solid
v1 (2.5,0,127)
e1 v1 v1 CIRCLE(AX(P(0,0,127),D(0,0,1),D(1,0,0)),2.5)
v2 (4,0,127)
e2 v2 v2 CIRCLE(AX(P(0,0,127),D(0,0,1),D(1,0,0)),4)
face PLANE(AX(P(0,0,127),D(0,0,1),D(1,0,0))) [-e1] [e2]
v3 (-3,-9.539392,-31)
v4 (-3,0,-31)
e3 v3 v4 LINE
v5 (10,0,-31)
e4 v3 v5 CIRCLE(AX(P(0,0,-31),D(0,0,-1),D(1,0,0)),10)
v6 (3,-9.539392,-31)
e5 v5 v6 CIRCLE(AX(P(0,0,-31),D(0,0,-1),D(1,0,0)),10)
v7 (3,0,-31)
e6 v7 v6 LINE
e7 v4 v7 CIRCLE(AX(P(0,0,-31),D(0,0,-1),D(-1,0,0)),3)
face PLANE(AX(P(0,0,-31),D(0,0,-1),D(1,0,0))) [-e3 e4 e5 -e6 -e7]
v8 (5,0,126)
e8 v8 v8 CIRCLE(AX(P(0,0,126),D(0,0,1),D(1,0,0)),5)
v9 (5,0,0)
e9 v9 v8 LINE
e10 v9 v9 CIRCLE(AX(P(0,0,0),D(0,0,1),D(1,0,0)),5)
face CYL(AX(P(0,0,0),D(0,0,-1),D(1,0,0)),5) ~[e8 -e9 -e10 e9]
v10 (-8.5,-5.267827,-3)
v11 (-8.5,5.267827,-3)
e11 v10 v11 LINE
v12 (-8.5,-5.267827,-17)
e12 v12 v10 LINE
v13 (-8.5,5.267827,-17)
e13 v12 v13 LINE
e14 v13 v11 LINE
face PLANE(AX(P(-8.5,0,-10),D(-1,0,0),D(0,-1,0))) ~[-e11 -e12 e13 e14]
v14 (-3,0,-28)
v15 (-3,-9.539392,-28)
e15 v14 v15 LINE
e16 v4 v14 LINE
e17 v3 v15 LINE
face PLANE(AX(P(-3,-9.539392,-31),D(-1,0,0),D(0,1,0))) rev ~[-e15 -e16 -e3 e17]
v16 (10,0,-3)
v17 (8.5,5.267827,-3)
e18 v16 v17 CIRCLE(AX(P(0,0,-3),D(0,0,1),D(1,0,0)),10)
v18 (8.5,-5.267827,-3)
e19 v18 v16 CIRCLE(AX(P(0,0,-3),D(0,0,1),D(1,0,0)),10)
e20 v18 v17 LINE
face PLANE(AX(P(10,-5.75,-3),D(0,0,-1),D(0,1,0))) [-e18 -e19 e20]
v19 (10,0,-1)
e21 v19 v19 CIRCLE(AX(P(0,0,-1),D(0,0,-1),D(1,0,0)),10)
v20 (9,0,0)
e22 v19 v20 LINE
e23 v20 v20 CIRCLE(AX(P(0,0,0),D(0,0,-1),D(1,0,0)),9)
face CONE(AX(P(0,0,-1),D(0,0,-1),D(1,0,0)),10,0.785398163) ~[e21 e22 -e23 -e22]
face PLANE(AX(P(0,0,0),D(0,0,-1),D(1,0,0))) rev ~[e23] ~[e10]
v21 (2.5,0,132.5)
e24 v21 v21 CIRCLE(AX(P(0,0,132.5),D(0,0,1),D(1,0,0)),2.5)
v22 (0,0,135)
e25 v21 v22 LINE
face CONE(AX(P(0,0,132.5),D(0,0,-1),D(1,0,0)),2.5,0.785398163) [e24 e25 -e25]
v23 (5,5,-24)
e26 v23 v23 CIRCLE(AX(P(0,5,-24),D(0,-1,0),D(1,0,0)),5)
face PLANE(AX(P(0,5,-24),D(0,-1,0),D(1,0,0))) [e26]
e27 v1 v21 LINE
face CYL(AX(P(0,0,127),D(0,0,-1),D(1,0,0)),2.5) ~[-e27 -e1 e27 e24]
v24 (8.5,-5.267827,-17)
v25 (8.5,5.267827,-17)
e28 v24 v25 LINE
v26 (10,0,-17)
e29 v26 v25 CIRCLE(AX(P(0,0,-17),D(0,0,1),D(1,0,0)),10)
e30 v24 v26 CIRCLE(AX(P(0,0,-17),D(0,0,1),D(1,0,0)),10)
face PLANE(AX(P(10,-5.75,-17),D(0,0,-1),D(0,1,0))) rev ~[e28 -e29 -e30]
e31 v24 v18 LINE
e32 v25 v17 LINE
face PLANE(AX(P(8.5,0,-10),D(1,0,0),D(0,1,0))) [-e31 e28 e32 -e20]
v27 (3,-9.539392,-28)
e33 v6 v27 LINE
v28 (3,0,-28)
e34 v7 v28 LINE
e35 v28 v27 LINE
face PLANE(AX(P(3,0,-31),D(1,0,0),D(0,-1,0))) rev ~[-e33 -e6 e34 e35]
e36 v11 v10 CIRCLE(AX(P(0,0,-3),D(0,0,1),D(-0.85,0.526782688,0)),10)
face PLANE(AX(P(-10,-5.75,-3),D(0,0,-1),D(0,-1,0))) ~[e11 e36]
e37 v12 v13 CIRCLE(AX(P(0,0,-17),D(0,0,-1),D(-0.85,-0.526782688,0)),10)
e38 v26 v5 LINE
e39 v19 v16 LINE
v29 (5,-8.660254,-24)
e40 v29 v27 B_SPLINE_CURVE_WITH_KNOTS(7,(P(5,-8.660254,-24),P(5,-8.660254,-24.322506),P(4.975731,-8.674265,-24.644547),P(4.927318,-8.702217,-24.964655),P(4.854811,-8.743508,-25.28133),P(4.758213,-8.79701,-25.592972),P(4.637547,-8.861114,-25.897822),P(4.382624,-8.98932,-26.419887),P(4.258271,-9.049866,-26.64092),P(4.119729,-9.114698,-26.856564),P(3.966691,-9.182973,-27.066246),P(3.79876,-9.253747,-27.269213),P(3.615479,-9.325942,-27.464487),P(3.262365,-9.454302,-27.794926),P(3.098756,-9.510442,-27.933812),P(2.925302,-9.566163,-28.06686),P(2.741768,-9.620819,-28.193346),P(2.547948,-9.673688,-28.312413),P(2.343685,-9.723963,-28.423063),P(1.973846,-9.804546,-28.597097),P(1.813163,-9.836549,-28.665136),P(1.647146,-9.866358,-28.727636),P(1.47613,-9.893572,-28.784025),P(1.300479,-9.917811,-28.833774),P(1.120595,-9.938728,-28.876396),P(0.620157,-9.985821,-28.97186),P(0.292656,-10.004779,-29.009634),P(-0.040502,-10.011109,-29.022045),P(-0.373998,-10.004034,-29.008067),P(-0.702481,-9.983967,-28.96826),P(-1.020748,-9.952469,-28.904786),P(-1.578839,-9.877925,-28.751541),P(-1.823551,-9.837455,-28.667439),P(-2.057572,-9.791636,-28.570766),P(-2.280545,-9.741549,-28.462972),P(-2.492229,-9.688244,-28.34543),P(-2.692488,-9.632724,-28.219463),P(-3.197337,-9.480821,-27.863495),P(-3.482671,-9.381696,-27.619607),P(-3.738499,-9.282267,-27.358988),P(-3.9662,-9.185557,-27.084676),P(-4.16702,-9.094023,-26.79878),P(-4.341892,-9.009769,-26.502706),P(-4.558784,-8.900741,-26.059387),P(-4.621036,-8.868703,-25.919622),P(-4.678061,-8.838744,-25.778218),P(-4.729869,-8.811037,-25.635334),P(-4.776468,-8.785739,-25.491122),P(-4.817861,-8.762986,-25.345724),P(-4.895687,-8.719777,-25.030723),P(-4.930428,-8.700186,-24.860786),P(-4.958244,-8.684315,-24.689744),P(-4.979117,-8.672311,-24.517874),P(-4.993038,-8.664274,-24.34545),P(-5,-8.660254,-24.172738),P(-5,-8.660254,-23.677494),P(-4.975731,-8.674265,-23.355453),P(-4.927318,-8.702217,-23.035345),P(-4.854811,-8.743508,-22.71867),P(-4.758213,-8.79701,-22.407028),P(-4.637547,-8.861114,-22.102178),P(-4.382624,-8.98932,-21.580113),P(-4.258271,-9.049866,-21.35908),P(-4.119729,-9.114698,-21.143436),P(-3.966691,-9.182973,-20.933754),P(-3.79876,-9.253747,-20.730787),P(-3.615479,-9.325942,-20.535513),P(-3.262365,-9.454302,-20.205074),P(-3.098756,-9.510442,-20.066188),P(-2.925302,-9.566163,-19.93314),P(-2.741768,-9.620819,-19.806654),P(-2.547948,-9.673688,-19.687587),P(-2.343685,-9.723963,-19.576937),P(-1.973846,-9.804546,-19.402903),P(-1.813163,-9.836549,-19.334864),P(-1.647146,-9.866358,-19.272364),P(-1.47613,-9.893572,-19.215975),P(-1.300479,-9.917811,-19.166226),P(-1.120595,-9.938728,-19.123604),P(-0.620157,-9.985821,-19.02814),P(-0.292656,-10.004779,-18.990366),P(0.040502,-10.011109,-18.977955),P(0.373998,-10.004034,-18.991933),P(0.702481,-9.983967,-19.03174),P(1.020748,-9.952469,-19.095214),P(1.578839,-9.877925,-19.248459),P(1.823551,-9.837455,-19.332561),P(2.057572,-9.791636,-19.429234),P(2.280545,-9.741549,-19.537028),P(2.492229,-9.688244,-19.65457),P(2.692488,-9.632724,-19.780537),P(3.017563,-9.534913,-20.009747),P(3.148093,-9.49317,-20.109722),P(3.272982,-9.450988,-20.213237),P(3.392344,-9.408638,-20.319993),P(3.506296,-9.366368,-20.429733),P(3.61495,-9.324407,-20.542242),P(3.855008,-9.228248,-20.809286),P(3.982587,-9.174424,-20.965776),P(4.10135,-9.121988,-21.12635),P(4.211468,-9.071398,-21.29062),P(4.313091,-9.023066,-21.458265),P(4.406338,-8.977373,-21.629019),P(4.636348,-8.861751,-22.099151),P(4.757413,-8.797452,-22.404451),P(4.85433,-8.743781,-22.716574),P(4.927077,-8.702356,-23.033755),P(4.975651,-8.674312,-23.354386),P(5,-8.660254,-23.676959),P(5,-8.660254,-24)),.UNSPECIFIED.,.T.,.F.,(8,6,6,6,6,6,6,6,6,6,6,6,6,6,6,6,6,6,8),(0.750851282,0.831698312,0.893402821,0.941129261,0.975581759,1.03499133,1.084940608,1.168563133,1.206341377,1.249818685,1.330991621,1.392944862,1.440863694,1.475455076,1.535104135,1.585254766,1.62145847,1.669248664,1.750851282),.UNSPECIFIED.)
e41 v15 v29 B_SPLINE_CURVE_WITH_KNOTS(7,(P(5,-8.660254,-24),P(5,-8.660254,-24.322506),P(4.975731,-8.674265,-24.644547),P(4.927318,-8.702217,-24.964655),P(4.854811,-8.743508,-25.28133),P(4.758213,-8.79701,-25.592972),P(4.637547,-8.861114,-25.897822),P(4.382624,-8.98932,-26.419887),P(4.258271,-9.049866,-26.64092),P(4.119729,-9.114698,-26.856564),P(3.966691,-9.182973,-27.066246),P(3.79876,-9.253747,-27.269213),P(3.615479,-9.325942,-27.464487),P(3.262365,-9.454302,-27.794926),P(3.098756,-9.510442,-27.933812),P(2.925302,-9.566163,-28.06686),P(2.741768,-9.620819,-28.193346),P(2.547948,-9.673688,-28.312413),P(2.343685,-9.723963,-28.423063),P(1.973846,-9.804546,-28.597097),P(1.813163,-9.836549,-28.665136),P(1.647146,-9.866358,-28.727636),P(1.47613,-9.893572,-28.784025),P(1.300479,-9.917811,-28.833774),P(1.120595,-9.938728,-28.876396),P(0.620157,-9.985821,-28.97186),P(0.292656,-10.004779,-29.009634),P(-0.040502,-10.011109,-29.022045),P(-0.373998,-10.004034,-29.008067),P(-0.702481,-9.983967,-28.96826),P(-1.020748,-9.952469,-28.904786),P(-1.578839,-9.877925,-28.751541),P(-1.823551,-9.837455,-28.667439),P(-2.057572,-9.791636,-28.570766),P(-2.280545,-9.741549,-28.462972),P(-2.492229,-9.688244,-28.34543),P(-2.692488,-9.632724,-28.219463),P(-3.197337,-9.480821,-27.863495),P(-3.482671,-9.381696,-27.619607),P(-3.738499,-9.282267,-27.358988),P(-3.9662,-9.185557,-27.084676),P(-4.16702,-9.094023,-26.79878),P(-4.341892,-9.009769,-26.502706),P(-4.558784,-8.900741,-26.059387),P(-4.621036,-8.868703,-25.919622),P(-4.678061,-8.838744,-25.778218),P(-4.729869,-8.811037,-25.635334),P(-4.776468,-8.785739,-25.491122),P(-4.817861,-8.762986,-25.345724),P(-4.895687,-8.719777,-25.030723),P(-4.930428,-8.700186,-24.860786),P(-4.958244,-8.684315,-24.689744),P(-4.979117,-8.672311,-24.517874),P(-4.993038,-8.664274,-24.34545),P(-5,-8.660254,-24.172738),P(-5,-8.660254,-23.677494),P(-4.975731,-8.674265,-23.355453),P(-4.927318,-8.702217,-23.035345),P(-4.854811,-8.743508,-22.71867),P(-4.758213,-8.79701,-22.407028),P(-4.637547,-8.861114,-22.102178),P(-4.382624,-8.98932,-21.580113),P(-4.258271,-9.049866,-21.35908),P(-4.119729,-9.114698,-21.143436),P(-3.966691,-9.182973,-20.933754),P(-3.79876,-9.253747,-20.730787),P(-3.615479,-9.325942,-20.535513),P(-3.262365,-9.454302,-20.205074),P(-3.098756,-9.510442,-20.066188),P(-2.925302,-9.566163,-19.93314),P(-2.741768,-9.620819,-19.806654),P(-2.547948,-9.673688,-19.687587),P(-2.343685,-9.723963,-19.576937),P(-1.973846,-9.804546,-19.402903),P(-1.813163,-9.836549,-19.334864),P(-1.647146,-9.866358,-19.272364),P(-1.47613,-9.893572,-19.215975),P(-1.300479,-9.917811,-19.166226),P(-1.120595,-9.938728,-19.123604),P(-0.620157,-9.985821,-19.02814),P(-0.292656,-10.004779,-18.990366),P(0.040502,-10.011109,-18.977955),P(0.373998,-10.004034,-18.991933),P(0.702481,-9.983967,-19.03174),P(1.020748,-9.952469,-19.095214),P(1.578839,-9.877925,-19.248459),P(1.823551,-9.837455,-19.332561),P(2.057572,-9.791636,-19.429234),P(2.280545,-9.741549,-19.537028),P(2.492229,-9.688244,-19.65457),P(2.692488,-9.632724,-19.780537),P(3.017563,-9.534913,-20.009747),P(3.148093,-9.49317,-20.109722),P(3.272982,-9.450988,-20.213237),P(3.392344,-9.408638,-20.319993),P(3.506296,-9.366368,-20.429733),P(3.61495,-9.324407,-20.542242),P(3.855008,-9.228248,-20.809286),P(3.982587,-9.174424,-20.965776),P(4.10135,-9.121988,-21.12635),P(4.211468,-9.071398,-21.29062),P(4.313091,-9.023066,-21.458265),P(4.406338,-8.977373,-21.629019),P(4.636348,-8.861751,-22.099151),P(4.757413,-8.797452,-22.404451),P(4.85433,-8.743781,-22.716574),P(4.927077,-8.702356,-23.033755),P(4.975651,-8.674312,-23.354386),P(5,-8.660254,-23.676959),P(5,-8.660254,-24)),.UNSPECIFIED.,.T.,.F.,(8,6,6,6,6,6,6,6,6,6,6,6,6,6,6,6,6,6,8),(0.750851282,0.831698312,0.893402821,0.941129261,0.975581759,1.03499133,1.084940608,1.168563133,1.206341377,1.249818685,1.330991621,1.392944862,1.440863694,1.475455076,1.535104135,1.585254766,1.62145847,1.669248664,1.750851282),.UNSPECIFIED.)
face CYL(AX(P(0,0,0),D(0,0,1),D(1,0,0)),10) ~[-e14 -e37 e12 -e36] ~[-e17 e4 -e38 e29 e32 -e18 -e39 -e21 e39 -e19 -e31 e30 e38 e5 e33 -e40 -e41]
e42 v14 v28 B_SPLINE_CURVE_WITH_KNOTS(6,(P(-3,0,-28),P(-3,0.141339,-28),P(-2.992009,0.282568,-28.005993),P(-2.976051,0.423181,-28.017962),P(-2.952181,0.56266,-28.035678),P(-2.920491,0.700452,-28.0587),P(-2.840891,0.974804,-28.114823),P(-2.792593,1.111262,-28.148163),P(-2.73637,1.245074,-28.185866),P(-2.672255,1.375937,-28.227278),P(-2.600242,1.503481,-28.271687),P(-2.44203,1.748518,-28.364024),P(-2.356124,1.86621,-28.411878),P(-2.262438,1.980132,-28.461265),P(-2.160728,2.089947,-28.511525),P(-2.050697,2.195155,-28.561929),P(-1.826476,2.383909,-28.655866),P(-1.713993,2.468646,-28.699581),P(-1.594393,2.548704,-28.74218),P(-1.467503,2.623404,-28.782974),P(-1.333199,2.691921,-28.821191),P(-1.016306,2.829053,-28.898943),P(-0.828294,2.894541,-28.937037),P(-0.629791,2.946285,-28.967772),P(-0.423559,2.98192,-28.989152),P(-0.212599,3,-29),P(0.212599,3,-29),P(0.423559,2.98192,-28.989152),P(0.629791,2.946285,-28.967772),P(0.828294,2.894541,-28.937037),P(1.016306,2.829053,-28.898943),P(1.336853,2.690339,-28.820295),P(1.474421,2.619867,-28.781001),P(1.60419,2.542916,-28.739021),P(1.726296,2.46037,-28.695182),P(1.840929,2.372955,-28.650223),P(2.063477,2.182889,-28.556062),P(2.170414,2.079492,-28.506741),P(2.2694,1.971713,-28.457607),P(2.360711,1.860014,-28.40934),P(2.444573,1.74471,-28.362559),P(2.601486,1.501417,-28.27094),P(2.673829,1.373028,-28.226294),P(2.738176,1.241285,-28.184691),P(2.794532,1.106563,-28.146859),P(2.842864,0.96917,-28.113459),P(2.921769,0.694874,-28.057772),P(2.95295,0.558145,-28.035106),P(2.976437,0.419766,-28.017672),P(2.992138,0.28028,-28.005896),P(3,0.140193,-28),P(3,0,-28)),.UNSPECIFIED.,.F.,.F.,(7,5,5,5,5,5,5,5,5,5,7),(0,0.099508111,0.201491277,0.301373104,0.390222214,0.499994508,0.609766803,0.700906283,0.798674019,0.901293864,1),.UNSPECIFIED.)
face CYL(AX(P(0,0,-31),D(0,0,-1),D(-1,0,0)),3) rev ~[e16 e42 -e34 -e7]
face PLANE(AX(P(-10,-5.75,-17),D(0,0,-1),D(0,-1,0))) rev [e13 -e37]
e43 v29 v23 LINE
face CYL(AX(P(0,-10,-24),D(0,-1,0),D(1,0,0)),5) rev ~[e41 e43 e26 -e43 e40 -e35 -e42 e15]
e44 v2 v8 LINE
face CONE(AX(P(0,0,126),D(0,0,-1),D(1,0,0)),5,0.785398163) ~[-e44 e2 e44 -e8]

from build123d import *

# Parameters (mm, degrees)
F0_R      = 5
F1_DEPTH  = 127
F2_R      = 2.5
F3_DEPTH  = 8
F4_SIZE   = 2.5
F5_SIZE   = 1
F6_R      = 10
F6_R_2    = 5
F7_DEPTH  = 31
F9_R      = 5
F10_DEPTH = 15
F12_DEPTH = 8
F13_SIZE  = 1
F15_W     = 11.5
F15_H     = 14
F16_DEPTH = 1.5


# Not quite as in the source:
# - a pattern or mirror of a feature is missing from the dataset's text; its kind, count and spacing are read off the source's solid


with BuildPart() as f1:
    # F0 (on Top) → F1 (new body)
    with BuildSketch(Plane.XY):
        Circle(F0_R)
    extrude(amount=F1_DEPTH)

    # F2 (on face) → F3 (join)
    with BuildSketch(Plane.XY.offset(127)):
        Circle(F2_R)
    extrude(amount=F3_DEPTH)

    # F4
    f4_edges = [f1.edges().sort_by_distance(p)[0] for p in [
        (-2.5, 0, 135),
    ]]
    chamfer(f4_edges, length=F4_SIZE)

    # F5
    f5_edges = [f1.edges().sort_by_distance(p)[0] for p in [
        (-5, 0, 127),
    ]]
    chamfer(f5_edges, length=F5_SIZE)

    # F6 (on face) → F7 (join)
    with BuildSketch(Plane(origin=(0, 0, 0), x_dir=(1, 0, 0), z_dir=(0, 0, -1))):
        Circle(F6_R)
        Circle(F6_R_2, mode=Mode.SUBTRACT)
        Circle(F6_R_2)
    extrude(amount=F7_DEPTH)

    # F9 (on offset) → F10 (cut)
    with BuildSketch(Plane.XZ.offset(10)):
        with Locations((0, -24)):
            Circle(F9_R)
    extrude(amount=-F10_DEPTH, mode=Mode.SUBTRACT)

    # F11 (on face) → F12 (cut)
    with BuildSketch(Plane(origin=(0, 0, -31), x_dir=(1, 0, 0), z_dir=(0, 0, -1))):
        with BuildLine():
            Line((-3, 9.5393920142), (-3, 0))
            ThreePointArc((-3, 0), (0, -3), (3, 0))
            Line((3, 0), (3, 9.5393920142))
            ThreePointArc((3, 9.5393920142), (0, 10), (-3, 9.5393920142))
        make_face()
    extrude(amount=-F12_DEPTH, mode=Mode.SUBTRACT)

    # F13
    f13_edges = [f1.edges().sort_by_distance(p)[0] for p in [
        (-10, 0, 0),
    ]]
    chamfer(f13_edges, length=F13_SIZE)

    # F15 (on offset) → F16 (cut)
    with BuildSketch(Plane.YZ.offset(10)):
        with Locations((0, -10)):
            Rectangle(F15_W, F15_H)
    f16 = extrude(amount=-F16_DEPTH, mode=Mode.SUBTRACT)

    # F16_copies: F16 across plane
    add(f16.mirror(Plane(origin=(0, 0, 0), x_dir=(0, 0, -1), z_dir=(-1, 0, 0))), mode=Mode.SUBTRACT)


solid = f1.part
